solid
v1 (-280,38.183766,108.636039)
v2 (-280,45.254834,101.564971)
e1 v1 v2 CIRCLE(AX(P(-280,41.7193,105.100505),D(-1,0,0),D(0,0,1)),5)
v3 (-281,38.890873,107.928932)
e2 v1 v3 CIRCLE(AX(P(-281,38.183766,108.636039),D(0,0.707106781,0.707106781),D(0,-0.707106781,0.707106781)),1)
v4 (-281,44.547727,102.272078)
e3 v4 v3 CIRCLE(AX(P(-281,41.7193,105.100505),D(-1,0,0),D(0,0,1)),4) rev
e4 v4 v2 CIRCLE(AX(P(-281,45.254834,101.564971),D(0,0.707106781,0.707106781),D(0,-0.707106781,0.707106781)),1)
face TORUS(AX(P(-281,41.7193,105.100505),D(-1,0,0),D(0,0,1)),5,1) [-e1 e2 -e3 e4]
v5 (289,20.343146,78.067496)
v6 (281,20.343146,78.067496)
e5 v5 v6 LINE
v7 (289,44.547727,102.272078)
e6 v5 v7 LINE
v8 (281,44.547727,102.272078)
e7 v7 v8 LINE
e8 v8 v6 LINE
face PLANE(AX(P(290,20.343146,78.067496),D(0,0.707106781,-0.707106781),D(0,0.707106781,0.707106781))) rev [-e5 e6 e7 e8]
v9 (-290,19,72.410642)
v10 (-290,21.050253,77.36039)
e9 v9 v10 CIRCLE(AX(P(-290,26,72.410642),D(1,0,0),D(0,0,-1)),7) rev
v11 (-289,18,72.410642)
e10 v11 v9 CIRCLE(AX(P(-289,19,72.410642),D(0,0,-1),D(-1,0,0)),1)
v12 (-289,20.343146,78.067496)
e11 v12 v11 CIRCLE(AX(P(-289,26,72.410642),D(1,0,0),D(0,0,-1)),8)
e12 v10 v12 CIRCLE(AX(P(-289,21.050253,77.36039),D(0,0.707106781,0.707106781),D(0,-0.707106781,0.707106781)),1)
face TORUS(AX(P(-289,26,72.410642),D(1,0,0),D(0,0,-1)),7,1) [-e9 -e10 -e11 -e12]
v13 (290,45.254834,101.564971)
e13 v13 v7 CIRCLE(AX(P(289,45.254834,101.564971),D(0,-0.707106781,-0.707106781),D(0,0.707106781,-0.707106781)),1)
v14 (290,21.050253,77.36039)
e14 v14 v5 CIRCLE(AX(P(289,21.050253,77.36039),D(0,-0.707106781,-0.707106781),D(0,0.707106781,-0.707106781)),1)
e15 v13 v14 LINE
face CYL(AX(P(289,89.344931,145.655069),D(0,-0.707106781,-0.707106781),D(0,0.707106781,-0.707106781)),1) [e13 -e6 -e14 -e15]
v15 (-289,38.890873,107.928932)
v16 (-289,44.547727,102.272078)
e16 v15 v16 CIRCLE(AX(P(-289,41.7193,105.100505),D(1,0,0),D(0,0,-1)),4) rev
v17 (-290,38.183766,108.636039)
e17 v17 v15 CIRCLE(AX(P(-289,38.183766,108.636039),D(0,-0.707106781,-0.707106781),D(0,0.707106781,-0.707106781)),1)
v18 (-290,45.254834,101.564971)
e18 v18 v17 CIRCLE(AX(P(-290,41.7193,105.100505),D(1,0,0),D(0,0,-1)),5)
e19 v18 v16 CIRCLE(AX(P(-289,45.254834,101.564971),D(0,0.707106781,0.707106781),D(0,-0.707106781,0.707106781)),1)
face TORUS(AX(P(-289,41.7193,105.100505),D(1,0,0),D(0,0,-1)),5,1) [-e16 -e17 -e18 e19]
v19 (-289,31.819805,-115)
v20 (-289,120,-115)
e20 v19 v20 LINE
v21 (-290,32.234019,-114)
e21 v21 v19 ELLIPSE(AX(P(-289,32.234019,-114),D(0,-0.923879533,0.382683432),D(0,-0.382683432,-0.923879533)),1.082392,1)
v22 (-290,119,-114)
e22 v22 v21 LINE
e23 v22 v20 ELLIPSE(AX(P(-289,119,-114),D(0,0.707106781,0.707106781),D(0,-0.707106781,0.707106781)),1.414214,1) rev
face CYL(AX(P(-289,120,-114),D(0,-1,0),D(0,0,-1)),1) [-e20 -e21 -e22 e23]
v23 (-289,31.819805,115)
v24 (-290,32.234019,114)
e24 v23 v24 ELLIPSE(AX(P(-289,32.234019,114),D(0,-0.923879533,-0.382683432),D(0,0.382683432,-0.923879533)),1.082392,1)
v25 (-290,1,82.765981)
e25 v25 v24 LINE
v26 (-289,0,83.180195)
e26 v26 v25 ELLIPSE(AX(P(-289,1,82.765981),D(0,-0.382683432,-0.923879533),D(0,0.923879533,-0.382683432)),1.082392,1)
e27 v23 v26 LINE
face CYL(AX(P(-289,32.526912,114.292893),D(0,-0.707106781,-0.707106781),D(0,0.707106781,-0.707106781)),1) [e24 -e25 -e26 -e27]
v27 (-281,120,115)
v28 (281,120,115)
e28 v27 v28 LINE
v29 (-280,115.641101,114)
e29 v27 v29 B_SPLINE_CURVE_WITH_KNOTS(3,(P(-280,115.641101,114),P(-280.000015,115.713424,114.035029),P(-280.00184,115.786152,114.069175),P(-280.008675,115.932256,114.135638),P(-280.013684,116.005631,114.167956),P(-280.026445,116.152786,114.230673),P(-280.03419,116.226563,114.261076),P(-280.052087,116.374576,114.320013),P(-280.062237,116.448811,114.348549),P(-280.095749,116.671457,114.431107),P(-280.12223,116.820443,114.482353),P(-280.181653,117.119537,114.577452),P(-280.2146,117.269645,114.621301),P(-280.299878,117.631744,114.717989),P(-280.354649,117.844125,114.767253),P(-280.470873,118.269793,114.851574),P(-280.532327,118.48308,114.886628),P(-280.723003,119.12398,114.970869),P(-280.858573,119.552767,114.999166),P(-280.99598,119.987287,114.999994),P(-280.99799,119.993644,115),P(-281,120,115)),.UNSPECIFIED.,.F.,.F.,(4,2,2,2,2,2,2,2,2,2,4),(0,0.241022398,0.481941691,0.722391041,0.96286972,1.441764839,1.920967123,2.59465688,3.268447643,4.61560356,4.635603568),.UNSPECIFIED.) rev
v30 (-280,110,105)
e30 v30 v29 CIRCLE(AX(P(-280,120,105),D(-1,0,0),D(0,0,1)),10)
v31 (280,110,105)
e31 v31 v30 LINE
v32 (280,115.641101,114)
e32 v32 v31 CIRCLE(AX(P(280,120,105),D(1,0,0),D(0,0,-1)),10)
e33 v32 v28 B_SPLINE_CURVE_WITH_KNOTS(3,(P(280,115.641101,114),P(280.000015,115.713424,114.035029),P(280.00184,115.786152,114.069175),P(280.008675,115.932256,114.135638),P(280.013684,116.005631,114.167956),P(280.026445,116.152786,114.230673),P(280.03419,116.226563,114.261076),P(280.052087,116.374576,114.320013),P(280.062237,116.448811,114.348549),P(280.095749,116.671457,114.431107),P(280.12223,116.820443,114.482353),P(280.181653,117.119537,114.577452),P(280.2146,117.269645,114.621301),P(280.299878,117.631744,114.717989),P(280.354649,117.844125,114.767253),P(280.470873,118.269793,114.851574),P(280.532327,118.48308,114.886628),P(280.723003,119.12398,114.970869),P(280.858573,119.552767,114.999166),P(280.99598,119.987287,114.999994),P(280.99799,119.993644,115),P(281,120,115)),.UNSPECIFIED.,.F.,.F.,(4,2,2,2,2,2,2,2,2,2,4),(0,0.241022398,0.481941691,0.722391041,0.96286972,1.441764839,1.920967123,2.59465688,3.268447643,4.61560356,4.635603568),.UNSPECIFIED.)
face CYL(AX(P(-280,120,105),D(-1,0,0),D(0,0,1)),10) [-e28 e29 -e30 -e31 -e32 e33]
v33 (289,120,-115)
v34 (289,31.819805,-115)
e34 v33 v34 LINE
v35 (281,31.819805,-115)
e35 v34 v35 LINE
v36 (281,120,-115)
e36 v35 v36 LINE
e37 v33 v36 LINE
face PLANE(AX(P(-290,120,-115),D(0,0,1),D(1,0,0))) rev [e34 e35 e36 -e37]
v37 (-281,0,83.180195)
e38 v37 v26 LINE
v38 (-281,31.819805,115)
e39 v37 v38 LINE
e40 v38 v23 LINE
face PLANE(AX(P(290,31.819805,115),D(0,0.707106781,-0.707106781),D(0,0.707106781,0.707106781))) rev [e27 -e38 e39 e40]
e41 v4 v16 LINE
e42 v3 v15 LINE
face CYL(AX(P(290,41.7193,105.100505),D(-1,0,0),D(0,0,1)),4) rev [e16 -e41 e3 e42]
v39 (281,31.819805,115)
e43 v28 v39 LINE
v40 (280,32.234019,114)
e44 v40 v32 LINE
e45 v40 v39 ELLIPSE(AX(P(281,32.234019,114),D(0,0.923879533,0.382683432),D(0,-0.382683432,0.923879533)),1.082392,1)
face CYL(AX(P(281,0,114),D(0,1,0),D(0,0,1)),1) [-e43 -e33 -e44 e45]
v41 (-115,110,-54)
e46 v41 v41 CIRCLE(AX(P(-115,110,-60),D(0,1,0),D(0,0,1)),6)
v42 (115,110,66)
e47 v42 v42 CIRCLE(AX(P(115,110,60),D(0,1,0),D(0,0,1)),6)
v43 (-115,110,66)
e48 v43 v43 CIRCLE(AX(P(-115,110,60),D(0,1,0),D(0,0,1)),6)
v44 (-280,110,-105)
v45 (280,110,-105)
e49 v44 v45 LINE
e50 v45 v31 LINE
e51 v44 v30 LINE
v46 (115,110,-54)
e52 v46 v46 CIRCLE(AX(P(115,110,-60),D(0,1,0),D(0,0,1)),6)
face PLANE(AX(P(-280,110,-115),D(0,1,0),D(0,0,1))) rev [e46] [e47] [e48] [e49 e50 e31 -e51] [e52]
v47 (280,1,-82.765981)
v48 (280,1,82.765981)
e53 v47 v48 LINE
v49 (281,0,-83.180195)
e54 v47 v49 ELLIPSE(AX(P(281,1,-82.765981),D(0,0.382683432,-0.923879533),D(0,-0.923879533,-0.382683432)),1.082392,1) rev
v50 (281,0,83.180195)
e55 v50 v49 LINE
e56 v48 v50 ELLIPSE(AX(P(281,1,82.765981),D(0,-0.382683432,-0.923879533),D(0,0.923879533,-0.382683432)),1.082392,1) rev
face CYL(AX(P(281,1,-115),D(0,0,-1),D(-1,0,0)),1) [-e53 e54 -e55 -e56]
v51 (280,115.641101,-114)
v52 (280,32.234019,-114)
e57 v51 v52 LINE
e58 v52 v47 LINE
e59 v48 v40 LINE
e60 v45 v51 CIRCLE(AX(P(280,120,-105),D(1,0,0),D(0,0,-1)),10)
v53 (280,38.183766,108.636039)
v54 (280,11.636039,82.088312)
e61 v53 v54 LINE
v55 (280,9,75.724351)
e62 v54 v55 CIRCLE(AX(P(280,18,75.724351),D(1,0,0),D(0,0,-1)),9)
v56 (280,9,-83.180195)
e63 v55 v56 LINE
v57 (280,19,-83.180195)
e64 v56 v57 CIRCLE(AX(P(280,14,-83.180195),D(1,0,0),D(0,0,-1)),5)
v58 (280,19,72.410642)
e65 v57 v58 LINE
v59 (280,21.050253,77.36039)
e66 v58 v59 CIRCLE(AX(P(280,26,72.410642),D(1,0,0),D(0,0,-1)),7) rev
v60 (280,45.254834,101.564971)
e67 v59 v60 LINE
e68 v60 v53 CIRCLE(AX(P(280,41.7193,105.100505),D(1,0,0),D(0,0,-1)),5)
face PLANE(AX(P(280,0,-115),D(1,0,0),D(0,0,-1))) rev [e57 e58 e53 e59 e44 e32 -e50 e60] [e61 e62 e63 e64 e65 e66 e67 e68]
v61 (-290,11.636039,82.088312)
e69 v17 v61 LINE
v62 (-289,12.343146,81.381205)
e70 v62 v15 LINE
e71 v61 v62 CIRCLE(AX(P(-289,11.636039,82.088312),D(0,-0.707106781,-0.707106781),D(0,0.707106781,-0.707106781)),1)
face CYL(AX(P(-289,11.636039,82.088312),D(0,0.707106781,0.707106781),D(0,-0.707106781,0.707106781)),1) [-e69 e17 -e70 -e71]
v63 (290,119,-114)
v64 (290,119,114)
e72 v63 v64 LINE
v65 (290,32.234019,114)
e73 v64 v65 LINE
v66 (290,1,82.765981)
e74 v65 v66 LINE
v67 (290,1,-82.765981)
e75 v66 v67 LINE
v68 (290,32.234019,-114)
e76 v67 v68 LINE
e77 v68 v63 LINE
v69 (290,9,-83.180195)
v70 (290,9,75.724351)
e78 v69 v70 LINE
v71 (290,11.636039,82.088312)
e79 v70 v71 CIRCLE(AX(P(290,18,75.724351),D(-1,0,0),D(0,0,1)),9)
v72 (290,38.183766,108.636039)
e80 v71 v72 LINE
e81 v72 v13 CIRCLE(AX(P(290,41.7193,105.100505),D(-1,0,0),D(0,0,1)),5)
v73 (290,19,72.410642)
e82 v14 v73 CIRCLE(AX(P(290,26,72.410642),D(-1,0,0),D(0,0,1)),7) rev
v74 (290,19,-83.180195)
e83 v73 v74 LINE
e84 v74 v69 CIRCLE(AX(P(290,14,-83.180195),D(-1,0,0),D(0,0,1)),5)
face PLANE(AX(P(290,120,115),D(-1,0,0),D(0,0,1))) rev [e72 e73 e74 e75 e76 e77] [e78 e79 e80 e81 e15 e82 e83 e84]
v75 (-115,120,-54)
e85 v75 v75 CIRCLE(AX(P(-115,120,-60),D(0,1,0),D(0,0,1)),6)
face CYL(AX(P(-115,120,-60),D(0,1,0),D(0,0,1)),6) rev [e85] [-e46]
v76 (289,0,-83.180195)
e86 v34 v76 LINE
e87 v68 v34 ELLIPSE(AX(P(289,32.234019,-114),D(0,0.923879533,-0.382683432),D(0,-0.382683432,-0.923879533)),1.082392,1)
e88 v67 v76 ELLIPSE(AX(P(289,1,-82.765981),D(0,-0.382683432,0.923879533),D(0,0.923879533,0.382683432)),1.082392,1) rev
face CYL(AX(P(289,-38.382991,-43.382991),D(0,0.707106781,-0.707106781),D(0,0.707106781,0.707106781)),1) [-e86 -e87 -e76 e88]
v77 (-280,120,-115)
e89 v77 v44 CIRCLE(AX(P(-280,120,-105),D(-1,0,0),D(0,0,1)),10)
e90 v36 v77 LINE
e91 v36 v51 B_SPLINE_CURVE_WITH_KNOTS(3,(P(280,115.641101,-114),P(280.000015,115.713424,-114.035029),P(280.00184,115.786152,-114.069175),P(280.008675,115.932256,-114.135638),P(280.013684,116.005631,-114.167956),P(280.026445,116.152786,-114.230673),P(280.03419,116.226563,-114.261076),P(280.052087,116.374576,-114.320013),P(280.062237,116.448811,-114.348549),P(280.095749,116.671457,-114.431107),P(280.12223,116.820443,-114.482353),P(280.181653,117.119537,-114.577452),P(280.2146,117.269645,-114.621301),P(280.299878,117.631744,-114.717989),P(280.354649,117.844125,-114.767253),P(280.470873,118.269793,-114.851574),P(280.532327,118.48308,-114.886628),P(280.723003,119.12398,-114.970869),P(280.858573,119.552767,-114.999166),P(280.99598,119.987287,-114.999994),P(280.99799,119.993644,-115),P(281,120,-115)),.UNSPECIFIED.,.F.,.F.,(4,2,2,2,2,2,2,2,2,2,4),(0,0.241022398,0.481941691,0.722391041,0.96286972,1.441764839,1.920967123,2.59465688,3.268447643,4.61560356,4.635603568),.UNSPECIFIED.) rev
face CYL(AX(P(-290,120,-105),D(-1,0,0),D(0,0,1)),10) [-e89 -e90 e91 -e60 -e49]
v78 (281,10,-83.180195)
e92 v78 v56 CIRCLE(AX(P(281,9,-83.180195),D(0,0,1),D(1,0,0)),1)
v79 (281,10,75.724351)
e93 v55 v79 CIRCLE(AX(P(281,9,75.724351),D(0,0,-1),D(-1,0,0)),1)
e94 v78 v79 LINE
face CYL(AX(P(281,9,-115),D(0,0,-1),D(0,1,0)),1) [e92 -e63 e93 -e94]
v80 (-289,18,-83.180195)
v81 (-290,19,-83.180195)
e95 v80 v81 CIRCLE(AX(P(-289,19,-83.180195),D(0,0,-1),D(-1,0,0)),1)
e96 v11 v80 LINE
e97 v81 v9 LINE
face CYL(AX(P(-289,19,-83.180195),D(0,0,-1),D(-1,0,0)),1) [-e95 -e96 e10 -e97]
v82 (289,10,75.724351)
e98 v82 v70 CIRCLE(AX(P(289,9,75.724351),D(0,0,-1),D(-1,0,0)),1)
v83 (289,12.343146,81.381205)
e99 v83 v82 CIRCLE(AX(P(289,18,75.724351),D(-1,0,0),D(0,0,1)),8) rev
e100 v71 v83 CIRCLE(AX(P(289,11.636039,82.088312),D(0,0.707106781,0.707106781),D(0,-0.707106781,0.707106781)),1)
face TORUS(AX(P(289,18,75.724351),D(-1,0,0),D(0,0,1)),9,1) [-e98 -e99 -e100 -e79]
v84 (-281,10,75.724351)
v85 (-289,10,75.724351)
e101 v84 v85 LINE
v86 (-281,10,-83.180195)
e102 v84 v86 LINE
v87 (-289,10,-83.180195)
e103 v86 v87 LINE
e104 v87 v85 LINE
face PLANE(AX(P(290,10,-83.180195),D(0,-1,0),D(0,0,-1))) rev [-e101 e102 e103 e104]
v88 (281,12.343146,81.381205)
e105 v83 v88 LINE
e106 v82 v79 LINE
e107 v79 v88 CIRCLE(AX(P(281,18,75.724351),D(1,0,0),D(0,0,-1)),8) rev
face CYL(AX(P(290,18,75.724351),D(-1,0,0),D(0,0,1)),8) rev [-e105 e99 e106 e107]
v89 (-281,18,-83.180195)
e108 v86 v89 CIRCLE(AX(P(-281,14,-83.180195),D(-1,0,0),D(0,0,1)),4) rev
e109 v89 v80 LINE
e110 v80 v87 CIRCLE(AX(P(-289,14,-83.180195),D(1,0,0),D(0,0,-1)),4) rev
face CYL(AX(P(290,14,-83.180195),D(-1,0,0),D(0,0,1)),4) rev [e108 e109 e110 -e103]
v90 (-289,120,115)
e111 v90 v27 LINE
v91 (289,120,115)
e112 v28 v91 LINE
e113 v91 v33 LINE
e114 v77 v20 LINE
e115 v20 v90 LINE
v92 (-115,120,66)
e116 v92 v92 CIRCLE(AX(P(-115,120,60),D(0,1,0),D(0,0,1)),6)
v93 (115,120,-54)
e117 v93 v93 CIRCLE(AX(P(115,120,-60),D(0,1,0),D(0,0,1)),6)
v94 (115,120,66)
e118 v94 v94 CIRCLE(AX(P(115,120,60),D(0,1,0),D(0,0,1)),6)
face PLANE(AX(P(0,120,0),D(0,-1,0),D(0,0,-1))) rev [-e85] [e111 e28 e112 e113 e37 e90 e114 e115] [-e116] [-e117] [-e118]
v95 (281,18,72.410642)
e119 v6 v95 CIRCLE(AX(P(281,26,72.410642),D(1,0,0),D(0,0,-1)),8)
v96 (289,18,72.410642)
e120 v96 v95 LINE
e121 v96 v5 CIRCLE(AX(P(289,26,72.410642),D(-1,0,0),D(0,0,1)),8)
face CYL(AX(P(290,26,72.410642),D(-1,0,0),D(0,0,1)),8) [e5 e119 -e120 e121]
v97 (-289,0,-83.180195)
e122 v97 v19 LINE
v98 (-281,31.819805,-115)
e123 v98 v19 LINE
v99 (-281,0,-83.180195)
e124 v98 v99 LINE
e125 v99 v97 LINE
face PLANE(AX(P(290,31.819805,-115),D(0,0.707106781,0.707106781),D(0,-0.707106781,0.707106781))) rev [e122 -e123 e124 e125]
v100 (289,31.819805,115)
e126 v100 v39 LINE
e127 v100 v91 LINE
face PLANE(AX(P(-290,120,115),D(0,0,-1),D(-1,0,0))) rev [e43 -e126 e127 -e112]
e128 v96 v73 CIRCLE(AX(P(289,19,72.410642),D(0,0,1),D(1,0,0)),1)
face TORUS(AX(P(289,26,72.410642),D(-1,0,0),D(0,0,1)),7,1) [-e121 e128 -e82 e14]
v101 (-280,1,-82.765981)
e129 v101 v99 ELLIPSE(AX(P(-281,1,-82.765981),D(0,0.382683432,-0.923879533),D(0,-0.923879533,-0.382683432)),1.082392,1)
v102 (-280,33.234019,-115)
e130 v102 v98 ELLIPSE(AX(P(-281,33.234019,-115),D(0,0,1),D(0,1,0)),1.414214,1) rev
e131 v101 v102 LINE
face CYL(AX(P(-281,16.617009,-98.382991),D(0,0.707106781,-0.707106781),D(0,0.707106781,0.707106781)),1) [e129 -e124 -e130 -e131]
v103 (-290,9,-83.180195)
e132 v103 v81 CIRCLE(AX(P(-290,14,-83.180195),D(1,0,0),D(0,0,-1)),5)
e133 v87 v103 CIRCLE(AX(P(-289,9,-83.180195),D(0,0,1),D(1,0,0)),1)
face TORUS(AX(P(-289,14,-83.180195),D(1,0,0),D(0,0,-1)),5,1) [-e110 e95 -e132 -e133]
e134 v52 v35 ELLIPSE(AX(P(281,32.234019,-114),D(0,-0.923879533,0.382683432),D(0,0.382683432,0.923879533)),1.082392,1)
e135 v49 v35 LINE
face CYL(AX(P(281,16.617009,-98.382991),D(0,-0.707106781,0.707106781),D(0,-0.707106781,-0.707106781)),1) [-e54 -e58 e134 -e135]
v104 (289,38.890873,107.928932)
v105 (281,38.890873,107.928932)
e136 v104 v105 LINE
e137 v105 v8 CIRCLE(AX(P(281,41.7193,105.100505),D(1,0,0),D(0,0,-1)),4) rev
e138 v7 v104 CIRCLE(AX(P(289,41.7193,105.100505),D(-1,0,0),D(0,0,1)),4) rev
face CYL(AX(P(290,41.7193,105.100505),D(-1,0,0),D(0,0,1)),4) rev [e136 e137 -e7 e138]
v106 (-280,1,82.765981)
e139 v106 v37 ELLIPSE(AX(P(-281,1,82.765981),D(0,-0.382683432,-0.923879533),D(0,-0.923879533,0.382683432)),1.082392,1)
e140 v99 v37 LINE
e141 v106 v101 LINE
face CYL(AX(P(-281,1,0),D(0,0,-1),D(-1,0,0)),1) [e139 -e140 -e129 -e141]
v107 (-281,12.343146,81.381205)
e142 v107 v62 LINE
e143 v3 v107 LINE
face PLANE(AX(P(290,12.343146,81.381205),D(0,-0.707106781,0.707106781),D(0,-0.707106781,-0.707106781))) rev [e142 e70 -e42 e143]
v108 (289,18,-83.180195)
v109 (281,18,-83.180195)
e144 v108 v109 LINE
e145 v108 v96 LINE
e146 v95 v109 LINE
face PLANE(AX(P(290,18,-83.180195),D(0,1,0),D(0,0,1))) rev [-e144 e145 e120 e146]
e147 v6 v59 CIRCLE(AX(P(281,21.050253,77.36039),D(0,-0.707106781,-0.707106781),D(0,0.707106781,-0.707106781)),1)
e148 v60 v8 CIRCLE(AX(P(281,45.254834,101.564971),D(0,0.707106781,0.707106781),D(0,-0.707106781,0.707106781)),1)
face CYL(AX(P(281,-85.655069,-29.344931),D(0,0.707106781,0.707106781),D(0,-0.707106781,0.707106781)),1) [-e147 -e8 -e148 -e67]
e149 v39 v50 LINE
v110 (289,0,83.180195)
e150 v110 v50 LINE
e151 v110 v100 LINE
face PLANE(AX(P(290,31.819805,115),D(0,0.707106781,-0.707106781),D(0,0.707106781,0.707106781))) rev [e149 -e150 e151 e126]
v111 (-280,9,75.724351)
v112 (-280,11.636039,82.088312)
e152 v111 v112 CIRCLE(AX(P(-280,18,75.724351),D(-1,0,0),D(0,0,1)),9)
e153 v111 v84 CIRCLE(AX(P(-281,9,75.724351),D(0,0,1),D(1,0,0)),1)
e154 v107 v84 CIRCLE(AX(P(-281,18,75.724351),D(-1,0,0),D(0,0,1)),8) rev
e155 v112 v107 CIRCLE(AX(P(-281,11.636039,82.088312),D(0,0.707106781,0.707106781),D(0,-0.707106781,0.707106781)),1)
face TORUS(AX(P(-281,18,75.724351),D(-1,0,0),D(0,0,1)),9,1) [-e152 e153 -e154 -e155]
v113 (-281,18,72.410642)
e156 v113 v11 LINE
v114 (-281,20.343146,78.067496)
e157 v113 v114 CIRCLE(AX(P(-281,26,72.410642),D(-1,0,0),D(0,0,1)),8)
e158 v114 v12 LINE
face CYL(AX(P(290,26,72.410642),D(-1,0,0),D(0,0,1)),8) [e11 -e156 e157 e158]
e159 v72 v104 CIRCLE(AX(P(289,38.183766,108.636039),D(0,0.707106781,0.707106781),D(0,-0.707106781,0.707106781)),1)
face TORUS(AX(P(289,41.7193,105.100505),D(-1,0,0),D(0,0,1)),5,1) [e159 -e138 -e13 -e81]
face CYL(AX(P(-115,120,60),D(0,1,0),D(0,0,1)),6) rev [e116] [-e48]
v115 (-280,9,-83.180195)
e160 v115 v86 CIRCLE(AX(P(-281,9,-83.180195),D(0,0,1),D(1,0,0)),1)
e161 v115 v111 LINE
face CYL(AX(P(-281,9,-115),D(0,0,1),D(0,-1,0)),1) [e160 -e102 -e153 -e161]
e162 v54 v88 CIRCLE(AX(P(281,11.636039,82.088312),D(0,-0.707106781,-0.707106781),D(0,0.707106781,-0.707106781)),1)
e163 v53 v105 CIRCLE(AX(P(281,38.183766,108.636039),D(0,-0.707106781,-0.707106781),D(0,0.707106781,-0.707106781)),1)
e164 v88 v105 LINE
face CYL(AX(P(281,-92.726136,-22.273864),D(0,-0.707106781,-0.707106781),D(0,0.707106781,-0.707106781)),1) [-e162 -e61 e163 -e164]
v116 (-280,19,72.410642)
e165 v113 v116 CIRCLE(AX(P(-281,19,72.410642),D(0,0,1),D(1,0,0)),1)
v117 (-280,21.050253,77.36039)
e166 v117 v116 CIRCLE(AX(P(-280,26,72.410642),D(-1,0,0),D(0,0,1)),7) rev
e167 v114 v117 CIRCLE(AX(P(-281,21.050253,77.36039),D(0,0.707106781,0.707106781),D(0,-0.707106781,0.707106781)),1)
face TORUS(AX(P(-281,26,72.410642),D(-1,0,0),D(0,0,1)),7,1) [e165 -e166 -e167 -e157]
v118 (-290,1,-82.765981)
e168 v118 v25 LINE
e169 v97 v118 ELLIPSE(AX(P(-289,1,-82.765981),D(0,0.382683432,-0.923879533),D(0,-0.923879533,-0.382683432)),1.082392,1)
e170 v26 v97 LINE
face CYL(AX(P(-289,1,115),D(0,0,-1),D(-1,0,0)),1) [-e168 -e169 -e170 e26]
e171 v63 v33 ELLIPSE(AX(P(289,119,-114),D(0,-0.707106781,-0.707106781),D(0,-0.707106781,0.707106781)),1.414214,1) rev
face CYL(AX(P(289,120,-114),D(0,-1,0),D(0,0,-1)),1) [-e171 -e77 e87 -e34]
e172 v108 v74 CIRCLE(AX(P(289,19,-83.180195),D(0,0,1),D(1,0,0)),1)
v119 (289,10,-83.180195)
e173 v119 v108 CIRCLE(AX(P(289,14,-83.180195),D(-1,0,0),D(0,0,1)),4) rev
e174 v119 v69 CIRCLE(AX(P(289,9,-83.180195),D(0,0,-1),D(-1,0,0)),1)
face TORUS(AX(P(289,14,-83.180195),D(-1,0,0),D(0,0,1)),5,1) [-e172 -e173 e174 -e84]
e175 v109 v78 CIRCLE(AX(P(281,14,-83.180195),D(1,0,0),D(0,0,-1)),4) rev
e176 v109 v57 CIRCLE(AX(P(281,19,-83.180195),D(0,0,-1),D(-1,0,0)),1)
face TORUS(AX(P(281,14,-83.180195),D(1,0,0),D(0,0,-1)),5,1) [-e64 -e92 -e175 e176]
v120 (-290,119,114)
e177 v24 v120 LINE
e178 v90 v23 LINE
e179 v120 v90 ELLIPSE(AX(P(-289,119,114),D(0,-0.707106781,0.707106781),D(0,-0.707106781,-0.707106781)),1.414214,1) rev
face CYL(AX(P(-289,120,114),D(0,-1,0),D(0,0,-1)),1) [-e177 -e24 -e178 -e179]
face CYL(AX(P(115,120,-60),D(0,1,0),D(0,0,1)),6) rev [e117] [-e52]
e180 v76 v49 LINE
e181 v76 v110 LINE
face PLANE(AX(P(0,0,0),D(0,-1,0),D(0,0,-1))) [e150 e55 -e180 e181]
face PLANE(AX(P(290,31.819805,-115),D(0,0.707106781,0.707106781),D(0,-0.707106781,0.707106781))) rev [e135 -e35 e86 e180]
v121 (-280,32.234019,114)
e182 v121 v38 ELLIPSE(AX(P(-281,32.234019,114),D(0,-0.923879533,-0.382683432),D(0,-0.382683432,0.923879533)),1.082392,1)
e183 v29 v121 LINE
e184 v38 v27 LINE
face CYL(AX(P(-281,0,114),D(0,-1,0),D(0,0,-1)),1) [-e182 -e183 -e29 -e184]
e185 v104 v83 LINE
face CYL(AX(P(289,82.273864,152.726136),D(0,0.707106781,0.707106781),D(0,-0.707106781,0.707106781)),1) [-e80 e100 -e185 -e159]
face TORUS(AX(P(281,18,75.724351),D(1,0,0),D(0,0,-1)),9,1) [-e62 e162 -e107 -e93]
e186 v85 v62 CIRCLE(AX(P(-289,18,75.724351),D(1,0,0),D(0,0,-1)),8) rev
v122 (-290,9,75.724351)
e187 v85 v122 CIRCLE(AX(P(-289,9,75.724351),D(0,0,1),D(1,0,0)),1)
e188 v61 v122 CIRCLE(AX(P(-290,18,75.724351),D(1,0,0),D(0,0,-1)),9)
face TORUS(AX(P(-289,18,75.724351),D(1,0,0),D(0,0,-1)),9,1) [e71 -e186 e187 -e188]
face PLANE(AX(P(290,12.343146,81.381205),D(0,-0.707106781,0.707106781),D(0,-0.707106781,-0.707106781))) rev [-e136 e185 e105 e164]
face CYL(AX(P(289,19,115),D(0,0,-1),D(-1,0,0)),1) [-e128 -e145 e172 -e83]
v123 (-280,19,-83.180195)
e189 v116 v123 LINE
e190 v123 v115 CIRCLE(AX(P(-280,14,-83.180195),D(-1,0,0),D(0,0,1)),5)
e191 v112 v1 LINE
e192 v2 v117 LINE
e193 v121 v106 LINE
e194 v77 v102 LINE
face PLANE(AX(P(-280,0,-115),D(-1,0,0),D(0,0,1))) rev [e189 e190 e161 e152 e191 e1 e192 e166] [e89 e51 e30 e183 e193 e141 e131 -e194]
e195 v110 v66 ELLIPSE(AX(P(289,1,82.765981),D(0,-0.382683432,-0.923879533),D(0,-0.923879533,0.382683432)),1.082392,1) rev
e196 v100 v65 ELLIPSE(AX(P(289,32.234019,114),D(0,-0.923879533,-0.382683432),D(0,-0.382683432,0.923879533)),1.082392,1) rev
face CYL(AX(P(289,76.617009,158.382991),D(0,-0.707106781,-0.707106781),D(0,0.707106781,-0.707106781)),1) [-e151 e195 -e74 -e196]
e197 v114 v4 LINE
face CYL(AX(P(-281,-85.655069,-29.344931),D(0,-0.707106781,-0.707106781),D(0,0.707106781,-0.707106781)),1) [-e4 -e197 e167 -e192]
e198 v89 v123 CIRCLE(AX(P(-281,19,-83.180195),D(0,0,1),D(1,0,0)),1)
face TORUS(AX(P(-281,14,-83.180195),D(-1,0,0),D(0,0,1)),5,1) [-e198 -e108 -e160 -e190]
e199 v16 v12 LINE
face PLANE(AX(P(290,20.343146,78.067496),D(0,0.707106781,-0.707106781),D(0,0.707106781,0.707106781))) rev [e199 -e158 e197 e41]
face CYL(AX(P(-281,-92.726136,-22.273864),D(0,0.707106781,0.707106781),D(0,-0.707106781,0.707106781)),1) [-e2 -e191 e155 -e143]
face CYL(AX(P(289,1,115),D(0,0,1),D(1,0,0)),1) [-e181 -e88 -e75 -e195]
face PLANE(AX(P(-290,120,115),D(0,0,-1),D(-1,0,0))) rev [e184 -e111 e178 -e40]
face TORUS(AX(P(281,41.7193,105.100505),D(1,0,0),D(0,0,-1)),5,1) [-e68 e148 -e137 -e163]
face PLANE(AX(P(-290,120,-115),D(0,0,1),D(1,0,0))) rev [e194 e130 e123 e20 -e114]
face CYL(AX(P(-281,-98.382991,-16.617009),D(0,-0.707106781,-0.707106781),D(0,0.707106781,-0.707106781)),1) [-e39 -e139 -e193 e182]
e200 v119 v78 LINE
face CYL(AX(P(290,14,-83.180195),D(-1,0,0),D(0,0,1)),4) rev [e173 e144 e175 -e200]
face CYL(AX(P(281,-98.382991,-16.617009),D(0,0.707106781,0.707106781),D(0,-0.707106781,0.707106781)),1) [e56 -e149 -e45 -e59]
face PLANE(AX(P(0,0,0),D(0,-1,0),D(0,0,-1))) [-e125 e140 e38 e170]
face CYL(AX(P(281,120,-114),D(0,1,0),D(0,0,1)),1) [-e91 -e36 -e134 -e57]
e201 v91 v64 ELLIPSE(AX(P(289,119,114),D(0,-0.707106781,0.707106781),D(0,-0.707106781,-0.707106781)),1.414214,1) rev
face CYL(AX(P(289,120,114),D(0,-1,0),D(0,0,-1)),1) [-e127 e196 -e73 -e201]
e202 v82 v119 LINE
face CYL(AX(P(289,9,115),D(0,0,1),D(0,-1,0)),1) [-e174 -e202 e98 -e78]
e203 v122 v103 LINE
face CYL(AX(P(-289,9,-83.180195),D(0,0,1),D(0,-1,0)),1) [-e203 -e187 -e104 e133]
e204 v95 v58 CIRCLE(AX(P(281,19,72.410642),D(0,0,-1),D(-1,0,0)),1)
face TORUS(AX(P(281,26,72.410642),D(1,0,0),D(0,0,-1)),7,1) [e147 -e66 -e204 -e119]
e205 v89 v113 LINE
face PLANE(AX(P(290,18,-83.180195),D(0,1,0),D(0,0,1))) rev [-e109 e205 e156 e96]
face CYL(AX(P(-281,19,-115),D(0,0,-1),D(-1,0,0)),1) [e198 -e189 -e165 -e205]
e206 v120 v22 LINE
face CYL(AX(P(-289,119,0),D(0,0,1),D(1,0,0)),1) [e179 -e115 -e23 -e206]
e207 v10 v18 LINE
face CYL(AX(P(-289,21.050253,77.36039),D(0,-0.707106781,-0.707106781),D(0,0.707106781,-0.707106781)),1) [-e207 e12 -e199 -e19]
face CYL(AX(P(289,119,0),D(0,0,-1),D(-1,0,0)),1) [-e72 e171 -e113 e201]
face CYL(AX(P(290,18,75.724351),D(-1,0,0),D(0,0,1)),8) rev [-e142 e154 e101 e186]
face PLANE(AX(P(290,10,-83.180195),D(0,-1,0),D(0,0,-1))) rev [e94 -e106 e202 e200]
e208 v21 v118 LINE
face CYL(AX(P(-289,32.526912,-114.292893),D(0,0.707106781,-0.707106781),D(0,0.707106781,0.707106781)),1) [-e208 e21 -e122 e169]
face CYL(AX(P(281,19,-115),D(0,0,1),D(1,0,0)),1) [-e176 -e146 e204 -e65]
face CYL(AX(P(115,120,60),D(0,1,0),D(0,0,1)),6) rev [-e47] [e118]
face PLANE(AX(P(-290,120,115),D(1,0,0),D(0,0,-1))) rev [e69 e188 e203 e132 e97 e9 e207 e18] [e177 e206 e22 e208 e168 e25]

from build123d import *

# Parameters (mm, degrees)
SZKIC1_W                    = 580
SZKIC1_H                    = 230
DODANIE_WYCI_GNI_CIE1_DEPTH = 120
SZKIC2_W                    = 560
SZKIC2_H                    = 110
WYTNIJ_WYCI_GNI_CIE1_DEPTH  = 390.101529167
WYTNIJ_WYCI_GNI_CIE2_DEPTH  = 604.344843352
WYTNIJ_WYCI_GNI_CIE3_DEPTH  = 604.344843352
OTWORY_USTALAJ_CE_12_0MM1_D = 12
ZAOKR_GLENIE1_R             = 10
ZAOKR_GLENIE2_R             = 1


with BuildPart() as part:
    # Szkic1 → Dodanie-wyciągnięcie1 (new body)
    with BuildSketch(Plane(origin=(0, 0, 0), x_dir=(1, 0, 0), z_dir=(0, 1, 0))):
        Rectangle(SZKIC1_W, SZKIC1_H)
    extrude(amount=DODANIE_WYCI_GNI_CIE1_DEPTH)

    # Szkic2 → Wytnij-wyciągnięcie1 (cut, through all)
    with BuildSketch(Plane.XY.offset(115)):
        with Locations((0, 55)):
            Rectangle(SZKIC2_W, SZKIC2_H)
    extrude(amount=-WYTNIJ_WYCI_GNI_CIE1_DEPTH, mode=Mode.SUBTRACT)

    # Szkic3 → Wytnij-wyciągnięcie2 (cut, through all)
    with BuildSketch(Plane.ZY.offset(290)):
        Polygon((115, 31.819805153), (83.180194847, 0), (115, 0), align=None)
        Polygon((-115, 31.819805153), (-83.180194847, 0), (-115, 0), align=None)
    extrude(amount=-WYTNIJ_WYCI_GNI_CIE2_DEPTH, mode=Mode.SUBTRACT)

    # Szkic4 → Wytnij-wyciągnięcie3 (cut, through all)
    with BuildSketch(Plane.ZY.offset(290)):
        with BuildLine():
            Line((81.381204973, 12.343145751), (107.928932188, 38.890872965))
            ThreePointArc((107.928932188, 38.890872965), (107.928932188, 44.547727215), (102.272077939, 44.547727215))
            Line((102.272077939, 44.547727215), (78.067496474, 20.343145751))
            ThreePointArc((78.067496474, 20.343145751), (75.472109684, 18.60896374), (72.410642225, 18))
            Line((72.410642225, 18), (-83.180194847, 18))
            ThreePointArc((-83.180194847, 18), (-87.180194847, 14), (-83.180194847, 10))
            Line((-83.180194847, 10), (75.724350724, 10))
            ThreePointArc((75.724350724, 10), (78.785818183, 10.60896374), (81.381204973, 12.343145751))
        make_face()
    extrude(amount=-WYTNIJ_WYCI_GNI_CIE3_DEPTH, mode=Mode.SUBTRACT)

    # Otwory ustalające Ø12.0mm1 (through all)
    with Locations(Plane(origin=(0, 120, 0), x_dir=(1, 0, 0), z_dir=(0, 1, 0))):
        with Locations((-115, 60), (115, 60), (115, -60), (-115, -60)):
            Hole(OTWORY_USTALAJ_CE_12_0MM1_D / 2)

    # Zaokrąglenie1
    zaokr_glenie1_edges = [part.edges().sort_by_distance(p)[0] for p in [
        (0, 110, -115),
        (0, 110, 115),
    ]]
    fillet(zaokr_glenie1_edges, radius=ZAOKR_GLENIE1_R - 0.0001)  # a hair under: the kernel refuses the full size

    # Zaokrąglenie2
    zaokr_glenie2_edges = [part.edges().sort_by_distance(p)[0] for p in [
        (-290, 120, 0),
        (-280, 75.909852577, 115),
        (280, 75.909852577, 115),
        (280, 75.909852577, -115),
        (280, 0, 0),
        (280, 15.909902577, -99.090097423),
        (280, 15.909902577, 99.090097423),
        (-280, 0, 0),
        (290, 0, 0),
        (-290, 0, 0),
        (-280, 15.909902577, 99.090097423),
        (290, 15.909902577, 99.090097423),
        (-290, 15.909902577, 99.090097423),
        (290, 120, 0),
        (-280, 15.909902577, -99.090097423),
        (290, 15.909902577, -99.090097423),
        (-290, 15.909902577, -99.090097423),
        (280, 10, -3.727922061),
        (280, 10.60896374, 78.785818183),
        (280, 25.617009358, 94.655068581),
        (280, 44.547727215, 107.928932188),
        (280, 32.445436483, 90.169787207),
        (280, 18.60896374, 75.472109684),
        (280, 18, -5.384776311),
        (280, 14, -87.180194847),
        (290, 75.909902577, 115),
        (-290, 75.909902577, 115),
        (-290, 75.909902577, -115),
        (290, 75.909902577, -115),
        (-280, 14, -87.180194847),
        (290, 14, -87.180194847),
        (-280, 18, -5.384776311),
        (290, 18, -5.384776311),
        (-280, 18.60896374, 75.472109684),
        (290, 18.60896374, 75.472109684),
        (-280, 32.445436483, 90.169787207),
        (290, 32.445436483, 90.169787207),
        (-280, 44.547727215, 107.928932188),
        (290, 44.547727215, 107.928932188),
        (-280, 25.617009358, 94.655068581),
        (290, 25.617009358, 94.655068581),
        (-280, 10.60896374, 78.785818183),
        (290, 10.60896374, 78.785818183),
        (-280, 10, -3.727922061),
        (290, 10, -3.727922061),
        (-290, 14, -87.180194847),
        (-290, 10, -3.727922061),
        (-290, 10.60896374, 78.785818183),
        (-290, 25.617009358, 94.655068581),
        (-290, 44.547727215, 107.928932188),
        (-290, 32.445436483, 90.169787207),
        (-290, 18.60896374, 75.472109684),
        (-290, 18, -5.384776311),
    ]]
    fillet(zaokr_glenie2_edges, radius=ZAOKR_GLENIE2_R)


solid = part.part
